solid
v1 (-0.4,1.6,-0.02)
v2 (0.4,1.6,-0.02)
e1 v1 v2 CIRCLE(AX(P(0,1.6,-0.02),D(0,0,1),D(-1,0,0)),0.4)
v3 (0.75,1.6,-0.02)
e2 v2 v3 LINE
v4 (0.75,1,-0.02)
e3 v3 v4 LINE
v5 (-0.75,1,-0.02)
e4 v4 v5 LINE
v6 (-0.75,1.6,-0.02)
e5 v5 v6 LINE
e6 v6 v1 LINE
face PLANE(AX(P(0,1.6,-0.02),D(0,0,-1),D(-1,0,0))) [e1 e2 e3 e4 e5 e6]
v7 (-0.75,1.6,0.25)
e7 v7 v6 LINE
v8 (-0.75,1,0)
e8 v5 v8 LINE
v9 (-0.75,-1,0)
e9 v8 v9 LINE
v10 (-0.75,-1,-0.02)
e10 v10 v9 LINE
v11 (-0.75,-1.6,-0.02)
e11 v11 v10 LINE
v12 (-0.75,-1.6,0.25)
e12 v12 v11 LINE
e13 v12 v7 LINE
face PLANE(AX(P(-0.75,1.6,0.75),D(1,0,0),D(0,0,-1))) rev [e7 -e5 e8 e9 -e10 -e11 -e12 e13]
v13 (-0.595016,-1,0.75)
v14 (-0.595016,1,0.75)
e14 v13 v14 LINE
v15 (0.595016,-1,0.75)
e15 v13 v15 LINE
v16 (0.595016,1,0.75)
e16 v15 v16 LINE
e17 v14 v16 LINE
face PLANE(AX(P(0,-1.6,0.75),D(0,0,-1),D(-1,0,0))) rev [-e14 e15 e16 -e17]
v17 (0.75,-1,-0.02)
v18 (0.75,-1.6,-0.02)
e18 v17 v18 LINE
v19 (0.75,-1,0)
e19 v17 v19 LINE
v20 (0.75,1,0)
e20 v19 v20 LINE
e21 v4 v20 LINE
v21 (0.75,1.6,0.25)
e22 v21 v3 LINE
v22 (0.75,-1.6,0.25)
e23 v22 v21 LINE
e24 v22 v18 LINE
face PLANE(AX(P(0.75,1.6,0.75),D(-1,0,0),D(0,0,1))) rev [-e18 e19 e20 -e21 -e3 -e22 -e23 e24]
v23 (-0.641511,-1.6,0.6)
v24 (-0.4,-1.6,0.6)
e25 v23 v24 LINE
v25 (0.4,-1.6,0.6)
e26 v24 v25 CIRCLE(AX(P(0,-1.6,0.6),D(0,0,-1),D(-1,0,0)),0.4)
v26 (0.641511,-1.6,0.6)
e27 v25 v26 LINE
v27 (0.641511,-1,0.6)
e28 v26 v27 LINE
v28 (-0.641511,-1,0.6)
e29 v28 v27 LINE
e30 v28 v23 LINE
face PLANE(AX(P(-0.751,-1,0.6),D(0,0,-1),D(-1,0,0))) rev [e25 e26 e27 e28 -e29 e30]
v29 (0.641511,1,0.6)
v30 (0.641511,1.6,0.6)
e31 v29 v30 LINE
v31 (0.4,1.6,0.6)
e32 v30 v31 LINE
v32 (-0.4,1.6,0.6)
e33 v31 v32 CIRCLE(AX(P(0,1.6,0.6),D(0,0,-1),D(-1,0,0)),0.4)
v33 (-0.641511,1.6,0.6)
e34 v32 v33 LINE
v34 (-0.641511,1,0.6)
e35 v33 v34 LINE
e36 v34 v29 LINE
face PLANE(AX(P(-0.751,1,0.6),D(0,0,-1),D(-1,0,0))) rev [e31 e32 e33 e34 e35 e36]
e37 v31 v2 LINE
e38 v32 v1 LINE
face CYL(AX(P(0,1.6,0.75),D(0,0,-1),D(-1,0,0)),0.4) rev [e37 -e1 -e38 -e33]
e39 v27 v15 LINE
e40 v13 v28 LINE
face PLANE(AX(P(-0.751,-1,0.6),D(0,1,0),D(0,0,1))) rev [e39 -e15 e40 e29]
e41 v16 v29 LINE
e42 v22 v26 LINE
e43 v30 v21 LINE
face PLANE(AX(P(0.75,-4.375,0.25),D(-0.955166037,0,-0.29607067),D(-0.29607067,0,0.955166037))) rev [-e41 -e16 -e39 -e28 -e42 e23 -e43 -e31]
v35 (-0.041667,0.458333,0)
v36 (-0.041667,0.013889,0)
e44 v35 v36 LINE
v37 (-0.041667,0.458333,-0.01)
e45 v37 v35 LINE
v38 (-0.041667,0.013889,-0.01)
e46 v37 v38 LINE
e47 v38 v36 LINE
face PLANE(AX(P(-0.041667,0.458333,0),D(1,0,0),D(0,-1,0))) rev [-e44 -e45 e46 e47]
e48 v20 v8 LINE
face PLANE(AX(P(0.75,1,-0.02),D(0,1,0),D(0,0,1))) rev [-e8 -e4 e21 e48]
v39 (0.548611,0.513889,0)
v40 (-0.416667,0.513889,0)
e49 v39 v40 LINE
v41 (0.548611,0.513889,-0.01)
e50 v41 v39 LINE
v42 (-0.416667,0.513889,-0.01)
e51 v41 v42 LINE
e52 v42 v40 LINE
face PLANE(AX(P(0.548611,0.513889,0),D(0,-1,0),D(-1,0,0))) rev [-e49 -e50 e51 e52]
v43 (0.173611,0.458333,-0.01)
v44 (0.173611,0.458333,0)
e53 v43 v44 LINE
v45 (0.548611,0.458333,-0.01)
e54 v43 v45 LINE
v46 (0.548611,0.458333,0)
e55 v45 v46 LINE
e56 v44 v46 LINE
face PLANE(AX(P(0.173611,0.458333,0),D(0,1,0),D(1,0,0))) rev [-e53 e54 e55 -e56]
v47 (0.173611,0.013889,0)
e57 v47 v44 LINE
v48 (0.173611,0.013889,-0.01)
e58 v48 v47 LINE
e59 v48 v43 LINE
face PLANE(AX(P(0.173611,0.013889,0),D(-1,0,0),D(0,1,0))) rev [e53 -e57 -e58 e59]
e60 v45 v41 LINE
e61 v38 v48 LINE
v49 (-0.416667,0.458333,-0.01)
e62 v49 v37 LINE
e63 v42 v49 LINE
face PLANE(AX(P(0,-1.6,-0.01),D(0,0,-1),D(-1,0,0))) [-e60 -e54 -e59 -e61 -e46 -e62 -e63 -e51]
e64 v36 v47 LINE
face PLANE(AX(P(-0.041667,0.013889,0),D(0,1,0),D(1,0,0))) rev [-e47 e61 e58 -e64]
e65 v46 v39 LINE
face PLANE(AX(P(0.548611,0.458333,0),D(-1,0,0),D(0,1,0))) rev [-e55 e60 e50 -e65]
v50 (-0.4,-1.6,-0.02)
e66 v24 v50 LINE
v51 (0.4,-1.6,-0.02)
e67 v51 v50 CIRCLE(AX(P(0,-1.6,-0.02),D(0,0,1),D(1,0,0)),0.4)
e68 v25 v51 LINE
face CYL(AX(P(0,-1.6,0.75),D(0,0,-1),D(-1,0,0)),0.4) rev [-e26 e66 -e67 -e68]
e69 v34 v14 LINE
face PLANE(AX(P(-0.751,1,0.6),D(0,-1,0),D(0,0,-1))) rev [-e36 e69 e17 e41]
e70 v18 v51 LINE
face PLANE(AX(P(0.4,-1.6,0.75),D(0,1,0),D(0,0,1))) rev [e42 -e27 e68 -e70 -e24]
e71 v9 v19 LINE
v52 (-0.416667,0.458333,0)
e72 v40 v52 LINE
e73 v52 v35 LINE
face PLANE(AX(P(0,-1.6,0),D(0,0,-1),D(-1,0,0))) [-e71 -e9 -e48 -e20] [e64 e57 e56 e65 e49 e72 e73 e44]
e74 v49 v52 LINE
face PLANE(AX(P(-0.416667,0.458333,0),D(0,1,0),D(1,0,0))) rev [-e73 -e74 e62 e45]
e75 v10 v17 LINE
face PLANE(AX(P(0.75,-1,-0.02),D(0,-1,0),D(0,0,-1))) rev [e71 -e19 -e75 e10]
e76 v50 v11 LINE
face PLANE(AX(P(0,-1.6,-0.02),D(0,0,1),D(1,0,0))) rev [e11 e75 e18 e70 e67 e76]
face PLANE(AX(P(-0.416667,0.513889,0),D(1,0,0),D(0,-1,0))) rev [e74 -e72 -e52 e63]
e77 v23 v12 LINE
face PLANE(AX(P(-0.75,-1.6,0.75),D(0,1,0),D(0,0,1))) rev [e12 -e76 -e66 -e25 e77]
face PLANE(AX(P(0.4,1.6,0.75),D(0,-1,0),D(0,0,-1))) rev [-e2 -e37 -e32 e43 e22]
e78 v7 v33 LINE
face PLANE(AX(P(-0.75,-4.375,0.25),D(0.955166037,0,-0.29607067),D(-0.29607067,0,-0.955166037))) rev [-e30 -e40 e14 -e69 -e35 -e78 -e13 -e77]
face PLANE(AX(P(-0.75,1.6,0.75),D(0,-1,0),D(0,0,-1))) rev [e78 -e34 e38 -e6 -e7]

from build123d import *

# Parameters (mm, degrees)
EXTRUDE_1_DEPTH     = 0.75
CUT_EXTRUDE_1_REACH = 4.318
SKETCH_2_W          = 0.15
SKETCH_2_H          = 0.667874604
WRAP_1_DEPTH        = 0.01
CUT_EXTRUDE_2_DEPTH = 5
EXTRUDE_START       = 0.02
EXTRUDE_2_DEPTH     = 0.02


# Read off the part's stored shape, not the designer's step: 包覆1
with BuildPart() as part:
    # 草图1 → 凸台-拉伸1 (new body)
    with BuildSketch(Plane.XY):
        with BuildLine():
            Line((-0.75, 1.6), (-0.4, 1.6))
            ThreePointArc((-0.4, 1.6), (0, 1.2), (0.4, 1.6))
            Line((0.4, 1.6), (0.75, 1.6))
            Line((0.75, 1.6), (0.75, -1.6))
            Line((0.75, -1.6), (0.4, -1.6))
            ThreePointArc((0.4, -1.6), (0, -1.2), (-0.4, -1.6))
            Line((-0.4, -1.6), (-0.75, -1.6))
            Line((-0.75, -1.6), (-0.75, 1.6))
        make_face()
    extrude(amount=EXTRUDE_1_DEPTH)

    # 草图2 → 切除-拉伸1 (cut, up to next)
    with BuildSketch(Plane(origin=(0.75, 0, 0), x_dir=(0, 0, -1), z_dir=(1, 0, 0)), mode=Mode.PRIVATE) as cut_extrude_1_sk1:
        with Locations((-0.675, 1.333937302)):
            Rectangle(SKETCH_2_W, SKETCH_2_H)
    cut_extrude_1_tool1 = extrude(cut_extrude_1_sk1.sketch, amount=-CUT_EXTRUDE_1_REACH, mode=Mode.PRIVATE) & part.part
    # 草图2 → 切除-拉伸1 (cut, up to next)
    with BuildSketch(Plane(origin=(0.75, 0, 0), x_dir=(0, 0, -1), z_dir=(1, 0, 0)), mode=Mode.PRIVATE) as cut_extrude_1_sk2:
        with Locations((-0.675, -1.333937302)):
            Rectangle(SKETCH_2_W, SKETCH_2_H)
    cut_extrude_1_tool2 = extrude(cut_extrude_1_sk2.sketch, amount=-CUT_EXTRUDE_1_REACH, mode=Mode.PRIVATE) & part.part
    add(cut_extrude_1_tool1.solids().sort_by_distance((0.75, 1.333937, 0.675))[0], mode=Mode.SUBTRACT)
    add(cut_extrude_1_tool2.solids().sort_by_distance((0.75, -1.333937, 0.675))[0], mode=Mode.SUBTRACT)

    # 包覆1 outline → 包覆1 (add)
    with BuildSketch(Plane(origin=(0, 0, 0), x_dir=(-1, 0, 0), z_dir=(0, 0, -1))):
        Polygon((0.041666667, 0.013888889), (0.041666667, 0.458333333), (0.416666667, 0.458333333), (0.416666667, 0.513888889), (-0.548611111, 0.513888889), (-0.548611111, 0.458333333), (-0.173611111, 0.458333333), (-0.173611111, 0.013888889), align=None)
    extrude(amount=WRAP_1_DEPTH)

    # 草图7 → 切除-拉伸2 (cut, symmetric)
    with BuildSketch(Plane(origin=(0, 0.625, 0), x_dir=(1, 0, 0), z_dir=(0, 1, 0))):
        Polygon((-0.75, -0.25), (-0.595016124, -0.75), (-0.75, -0.75), align=None)
        Polygon((0.595016124, -0.75), (0.75, -0.75), (0.75, -0.25), align=None)
    extrude(amount=CUT_EXTRUDE_2_DEPTH, both=True, mode=Mode.SUBTRACT)

    # 草图8 → 凸台-拉伸2 (add)
    with BuildSketch(Plane(origin=(0, 0, 0), x_dir=(-1, 0, 0), z_dir=(0, 0, -1)).offset(EXTRUDE_START)):
        with BuildLine():
            Line((-0.75, 1), (0.75, 1))
            Line((0.75, 1), (0.75, 1.6))
            Line((0.75, 1.6), (0.4, 1.6))
            ThreePointArc((0.4, 1.6), (0, 1.2), (-0.4, 1.6))
            Line((-0.4, 1.6), (-0.75, 1.6))
            Line((-0.75, 1.6), (-0.75, 1))
        make_face()
        with BuildLine():
            Line((-0.75, -1), (0.75, -1))
            Line((0.75, -1), (0.75, -1.6))
            Line((0.75, -1.6), (0.4, -1.6))
            ThreePointArc((0.4, -1.6), (0, -1.2), (-0.4, -1.6))
            Line((-0.4, -1.6), (-0.75, -1.6))
            Line((-0.75, -1.6), (-0.75, -1))
        make_face()
    extrude(amount=-EXTRUDE_2_DEPTH)


solid = part.part
